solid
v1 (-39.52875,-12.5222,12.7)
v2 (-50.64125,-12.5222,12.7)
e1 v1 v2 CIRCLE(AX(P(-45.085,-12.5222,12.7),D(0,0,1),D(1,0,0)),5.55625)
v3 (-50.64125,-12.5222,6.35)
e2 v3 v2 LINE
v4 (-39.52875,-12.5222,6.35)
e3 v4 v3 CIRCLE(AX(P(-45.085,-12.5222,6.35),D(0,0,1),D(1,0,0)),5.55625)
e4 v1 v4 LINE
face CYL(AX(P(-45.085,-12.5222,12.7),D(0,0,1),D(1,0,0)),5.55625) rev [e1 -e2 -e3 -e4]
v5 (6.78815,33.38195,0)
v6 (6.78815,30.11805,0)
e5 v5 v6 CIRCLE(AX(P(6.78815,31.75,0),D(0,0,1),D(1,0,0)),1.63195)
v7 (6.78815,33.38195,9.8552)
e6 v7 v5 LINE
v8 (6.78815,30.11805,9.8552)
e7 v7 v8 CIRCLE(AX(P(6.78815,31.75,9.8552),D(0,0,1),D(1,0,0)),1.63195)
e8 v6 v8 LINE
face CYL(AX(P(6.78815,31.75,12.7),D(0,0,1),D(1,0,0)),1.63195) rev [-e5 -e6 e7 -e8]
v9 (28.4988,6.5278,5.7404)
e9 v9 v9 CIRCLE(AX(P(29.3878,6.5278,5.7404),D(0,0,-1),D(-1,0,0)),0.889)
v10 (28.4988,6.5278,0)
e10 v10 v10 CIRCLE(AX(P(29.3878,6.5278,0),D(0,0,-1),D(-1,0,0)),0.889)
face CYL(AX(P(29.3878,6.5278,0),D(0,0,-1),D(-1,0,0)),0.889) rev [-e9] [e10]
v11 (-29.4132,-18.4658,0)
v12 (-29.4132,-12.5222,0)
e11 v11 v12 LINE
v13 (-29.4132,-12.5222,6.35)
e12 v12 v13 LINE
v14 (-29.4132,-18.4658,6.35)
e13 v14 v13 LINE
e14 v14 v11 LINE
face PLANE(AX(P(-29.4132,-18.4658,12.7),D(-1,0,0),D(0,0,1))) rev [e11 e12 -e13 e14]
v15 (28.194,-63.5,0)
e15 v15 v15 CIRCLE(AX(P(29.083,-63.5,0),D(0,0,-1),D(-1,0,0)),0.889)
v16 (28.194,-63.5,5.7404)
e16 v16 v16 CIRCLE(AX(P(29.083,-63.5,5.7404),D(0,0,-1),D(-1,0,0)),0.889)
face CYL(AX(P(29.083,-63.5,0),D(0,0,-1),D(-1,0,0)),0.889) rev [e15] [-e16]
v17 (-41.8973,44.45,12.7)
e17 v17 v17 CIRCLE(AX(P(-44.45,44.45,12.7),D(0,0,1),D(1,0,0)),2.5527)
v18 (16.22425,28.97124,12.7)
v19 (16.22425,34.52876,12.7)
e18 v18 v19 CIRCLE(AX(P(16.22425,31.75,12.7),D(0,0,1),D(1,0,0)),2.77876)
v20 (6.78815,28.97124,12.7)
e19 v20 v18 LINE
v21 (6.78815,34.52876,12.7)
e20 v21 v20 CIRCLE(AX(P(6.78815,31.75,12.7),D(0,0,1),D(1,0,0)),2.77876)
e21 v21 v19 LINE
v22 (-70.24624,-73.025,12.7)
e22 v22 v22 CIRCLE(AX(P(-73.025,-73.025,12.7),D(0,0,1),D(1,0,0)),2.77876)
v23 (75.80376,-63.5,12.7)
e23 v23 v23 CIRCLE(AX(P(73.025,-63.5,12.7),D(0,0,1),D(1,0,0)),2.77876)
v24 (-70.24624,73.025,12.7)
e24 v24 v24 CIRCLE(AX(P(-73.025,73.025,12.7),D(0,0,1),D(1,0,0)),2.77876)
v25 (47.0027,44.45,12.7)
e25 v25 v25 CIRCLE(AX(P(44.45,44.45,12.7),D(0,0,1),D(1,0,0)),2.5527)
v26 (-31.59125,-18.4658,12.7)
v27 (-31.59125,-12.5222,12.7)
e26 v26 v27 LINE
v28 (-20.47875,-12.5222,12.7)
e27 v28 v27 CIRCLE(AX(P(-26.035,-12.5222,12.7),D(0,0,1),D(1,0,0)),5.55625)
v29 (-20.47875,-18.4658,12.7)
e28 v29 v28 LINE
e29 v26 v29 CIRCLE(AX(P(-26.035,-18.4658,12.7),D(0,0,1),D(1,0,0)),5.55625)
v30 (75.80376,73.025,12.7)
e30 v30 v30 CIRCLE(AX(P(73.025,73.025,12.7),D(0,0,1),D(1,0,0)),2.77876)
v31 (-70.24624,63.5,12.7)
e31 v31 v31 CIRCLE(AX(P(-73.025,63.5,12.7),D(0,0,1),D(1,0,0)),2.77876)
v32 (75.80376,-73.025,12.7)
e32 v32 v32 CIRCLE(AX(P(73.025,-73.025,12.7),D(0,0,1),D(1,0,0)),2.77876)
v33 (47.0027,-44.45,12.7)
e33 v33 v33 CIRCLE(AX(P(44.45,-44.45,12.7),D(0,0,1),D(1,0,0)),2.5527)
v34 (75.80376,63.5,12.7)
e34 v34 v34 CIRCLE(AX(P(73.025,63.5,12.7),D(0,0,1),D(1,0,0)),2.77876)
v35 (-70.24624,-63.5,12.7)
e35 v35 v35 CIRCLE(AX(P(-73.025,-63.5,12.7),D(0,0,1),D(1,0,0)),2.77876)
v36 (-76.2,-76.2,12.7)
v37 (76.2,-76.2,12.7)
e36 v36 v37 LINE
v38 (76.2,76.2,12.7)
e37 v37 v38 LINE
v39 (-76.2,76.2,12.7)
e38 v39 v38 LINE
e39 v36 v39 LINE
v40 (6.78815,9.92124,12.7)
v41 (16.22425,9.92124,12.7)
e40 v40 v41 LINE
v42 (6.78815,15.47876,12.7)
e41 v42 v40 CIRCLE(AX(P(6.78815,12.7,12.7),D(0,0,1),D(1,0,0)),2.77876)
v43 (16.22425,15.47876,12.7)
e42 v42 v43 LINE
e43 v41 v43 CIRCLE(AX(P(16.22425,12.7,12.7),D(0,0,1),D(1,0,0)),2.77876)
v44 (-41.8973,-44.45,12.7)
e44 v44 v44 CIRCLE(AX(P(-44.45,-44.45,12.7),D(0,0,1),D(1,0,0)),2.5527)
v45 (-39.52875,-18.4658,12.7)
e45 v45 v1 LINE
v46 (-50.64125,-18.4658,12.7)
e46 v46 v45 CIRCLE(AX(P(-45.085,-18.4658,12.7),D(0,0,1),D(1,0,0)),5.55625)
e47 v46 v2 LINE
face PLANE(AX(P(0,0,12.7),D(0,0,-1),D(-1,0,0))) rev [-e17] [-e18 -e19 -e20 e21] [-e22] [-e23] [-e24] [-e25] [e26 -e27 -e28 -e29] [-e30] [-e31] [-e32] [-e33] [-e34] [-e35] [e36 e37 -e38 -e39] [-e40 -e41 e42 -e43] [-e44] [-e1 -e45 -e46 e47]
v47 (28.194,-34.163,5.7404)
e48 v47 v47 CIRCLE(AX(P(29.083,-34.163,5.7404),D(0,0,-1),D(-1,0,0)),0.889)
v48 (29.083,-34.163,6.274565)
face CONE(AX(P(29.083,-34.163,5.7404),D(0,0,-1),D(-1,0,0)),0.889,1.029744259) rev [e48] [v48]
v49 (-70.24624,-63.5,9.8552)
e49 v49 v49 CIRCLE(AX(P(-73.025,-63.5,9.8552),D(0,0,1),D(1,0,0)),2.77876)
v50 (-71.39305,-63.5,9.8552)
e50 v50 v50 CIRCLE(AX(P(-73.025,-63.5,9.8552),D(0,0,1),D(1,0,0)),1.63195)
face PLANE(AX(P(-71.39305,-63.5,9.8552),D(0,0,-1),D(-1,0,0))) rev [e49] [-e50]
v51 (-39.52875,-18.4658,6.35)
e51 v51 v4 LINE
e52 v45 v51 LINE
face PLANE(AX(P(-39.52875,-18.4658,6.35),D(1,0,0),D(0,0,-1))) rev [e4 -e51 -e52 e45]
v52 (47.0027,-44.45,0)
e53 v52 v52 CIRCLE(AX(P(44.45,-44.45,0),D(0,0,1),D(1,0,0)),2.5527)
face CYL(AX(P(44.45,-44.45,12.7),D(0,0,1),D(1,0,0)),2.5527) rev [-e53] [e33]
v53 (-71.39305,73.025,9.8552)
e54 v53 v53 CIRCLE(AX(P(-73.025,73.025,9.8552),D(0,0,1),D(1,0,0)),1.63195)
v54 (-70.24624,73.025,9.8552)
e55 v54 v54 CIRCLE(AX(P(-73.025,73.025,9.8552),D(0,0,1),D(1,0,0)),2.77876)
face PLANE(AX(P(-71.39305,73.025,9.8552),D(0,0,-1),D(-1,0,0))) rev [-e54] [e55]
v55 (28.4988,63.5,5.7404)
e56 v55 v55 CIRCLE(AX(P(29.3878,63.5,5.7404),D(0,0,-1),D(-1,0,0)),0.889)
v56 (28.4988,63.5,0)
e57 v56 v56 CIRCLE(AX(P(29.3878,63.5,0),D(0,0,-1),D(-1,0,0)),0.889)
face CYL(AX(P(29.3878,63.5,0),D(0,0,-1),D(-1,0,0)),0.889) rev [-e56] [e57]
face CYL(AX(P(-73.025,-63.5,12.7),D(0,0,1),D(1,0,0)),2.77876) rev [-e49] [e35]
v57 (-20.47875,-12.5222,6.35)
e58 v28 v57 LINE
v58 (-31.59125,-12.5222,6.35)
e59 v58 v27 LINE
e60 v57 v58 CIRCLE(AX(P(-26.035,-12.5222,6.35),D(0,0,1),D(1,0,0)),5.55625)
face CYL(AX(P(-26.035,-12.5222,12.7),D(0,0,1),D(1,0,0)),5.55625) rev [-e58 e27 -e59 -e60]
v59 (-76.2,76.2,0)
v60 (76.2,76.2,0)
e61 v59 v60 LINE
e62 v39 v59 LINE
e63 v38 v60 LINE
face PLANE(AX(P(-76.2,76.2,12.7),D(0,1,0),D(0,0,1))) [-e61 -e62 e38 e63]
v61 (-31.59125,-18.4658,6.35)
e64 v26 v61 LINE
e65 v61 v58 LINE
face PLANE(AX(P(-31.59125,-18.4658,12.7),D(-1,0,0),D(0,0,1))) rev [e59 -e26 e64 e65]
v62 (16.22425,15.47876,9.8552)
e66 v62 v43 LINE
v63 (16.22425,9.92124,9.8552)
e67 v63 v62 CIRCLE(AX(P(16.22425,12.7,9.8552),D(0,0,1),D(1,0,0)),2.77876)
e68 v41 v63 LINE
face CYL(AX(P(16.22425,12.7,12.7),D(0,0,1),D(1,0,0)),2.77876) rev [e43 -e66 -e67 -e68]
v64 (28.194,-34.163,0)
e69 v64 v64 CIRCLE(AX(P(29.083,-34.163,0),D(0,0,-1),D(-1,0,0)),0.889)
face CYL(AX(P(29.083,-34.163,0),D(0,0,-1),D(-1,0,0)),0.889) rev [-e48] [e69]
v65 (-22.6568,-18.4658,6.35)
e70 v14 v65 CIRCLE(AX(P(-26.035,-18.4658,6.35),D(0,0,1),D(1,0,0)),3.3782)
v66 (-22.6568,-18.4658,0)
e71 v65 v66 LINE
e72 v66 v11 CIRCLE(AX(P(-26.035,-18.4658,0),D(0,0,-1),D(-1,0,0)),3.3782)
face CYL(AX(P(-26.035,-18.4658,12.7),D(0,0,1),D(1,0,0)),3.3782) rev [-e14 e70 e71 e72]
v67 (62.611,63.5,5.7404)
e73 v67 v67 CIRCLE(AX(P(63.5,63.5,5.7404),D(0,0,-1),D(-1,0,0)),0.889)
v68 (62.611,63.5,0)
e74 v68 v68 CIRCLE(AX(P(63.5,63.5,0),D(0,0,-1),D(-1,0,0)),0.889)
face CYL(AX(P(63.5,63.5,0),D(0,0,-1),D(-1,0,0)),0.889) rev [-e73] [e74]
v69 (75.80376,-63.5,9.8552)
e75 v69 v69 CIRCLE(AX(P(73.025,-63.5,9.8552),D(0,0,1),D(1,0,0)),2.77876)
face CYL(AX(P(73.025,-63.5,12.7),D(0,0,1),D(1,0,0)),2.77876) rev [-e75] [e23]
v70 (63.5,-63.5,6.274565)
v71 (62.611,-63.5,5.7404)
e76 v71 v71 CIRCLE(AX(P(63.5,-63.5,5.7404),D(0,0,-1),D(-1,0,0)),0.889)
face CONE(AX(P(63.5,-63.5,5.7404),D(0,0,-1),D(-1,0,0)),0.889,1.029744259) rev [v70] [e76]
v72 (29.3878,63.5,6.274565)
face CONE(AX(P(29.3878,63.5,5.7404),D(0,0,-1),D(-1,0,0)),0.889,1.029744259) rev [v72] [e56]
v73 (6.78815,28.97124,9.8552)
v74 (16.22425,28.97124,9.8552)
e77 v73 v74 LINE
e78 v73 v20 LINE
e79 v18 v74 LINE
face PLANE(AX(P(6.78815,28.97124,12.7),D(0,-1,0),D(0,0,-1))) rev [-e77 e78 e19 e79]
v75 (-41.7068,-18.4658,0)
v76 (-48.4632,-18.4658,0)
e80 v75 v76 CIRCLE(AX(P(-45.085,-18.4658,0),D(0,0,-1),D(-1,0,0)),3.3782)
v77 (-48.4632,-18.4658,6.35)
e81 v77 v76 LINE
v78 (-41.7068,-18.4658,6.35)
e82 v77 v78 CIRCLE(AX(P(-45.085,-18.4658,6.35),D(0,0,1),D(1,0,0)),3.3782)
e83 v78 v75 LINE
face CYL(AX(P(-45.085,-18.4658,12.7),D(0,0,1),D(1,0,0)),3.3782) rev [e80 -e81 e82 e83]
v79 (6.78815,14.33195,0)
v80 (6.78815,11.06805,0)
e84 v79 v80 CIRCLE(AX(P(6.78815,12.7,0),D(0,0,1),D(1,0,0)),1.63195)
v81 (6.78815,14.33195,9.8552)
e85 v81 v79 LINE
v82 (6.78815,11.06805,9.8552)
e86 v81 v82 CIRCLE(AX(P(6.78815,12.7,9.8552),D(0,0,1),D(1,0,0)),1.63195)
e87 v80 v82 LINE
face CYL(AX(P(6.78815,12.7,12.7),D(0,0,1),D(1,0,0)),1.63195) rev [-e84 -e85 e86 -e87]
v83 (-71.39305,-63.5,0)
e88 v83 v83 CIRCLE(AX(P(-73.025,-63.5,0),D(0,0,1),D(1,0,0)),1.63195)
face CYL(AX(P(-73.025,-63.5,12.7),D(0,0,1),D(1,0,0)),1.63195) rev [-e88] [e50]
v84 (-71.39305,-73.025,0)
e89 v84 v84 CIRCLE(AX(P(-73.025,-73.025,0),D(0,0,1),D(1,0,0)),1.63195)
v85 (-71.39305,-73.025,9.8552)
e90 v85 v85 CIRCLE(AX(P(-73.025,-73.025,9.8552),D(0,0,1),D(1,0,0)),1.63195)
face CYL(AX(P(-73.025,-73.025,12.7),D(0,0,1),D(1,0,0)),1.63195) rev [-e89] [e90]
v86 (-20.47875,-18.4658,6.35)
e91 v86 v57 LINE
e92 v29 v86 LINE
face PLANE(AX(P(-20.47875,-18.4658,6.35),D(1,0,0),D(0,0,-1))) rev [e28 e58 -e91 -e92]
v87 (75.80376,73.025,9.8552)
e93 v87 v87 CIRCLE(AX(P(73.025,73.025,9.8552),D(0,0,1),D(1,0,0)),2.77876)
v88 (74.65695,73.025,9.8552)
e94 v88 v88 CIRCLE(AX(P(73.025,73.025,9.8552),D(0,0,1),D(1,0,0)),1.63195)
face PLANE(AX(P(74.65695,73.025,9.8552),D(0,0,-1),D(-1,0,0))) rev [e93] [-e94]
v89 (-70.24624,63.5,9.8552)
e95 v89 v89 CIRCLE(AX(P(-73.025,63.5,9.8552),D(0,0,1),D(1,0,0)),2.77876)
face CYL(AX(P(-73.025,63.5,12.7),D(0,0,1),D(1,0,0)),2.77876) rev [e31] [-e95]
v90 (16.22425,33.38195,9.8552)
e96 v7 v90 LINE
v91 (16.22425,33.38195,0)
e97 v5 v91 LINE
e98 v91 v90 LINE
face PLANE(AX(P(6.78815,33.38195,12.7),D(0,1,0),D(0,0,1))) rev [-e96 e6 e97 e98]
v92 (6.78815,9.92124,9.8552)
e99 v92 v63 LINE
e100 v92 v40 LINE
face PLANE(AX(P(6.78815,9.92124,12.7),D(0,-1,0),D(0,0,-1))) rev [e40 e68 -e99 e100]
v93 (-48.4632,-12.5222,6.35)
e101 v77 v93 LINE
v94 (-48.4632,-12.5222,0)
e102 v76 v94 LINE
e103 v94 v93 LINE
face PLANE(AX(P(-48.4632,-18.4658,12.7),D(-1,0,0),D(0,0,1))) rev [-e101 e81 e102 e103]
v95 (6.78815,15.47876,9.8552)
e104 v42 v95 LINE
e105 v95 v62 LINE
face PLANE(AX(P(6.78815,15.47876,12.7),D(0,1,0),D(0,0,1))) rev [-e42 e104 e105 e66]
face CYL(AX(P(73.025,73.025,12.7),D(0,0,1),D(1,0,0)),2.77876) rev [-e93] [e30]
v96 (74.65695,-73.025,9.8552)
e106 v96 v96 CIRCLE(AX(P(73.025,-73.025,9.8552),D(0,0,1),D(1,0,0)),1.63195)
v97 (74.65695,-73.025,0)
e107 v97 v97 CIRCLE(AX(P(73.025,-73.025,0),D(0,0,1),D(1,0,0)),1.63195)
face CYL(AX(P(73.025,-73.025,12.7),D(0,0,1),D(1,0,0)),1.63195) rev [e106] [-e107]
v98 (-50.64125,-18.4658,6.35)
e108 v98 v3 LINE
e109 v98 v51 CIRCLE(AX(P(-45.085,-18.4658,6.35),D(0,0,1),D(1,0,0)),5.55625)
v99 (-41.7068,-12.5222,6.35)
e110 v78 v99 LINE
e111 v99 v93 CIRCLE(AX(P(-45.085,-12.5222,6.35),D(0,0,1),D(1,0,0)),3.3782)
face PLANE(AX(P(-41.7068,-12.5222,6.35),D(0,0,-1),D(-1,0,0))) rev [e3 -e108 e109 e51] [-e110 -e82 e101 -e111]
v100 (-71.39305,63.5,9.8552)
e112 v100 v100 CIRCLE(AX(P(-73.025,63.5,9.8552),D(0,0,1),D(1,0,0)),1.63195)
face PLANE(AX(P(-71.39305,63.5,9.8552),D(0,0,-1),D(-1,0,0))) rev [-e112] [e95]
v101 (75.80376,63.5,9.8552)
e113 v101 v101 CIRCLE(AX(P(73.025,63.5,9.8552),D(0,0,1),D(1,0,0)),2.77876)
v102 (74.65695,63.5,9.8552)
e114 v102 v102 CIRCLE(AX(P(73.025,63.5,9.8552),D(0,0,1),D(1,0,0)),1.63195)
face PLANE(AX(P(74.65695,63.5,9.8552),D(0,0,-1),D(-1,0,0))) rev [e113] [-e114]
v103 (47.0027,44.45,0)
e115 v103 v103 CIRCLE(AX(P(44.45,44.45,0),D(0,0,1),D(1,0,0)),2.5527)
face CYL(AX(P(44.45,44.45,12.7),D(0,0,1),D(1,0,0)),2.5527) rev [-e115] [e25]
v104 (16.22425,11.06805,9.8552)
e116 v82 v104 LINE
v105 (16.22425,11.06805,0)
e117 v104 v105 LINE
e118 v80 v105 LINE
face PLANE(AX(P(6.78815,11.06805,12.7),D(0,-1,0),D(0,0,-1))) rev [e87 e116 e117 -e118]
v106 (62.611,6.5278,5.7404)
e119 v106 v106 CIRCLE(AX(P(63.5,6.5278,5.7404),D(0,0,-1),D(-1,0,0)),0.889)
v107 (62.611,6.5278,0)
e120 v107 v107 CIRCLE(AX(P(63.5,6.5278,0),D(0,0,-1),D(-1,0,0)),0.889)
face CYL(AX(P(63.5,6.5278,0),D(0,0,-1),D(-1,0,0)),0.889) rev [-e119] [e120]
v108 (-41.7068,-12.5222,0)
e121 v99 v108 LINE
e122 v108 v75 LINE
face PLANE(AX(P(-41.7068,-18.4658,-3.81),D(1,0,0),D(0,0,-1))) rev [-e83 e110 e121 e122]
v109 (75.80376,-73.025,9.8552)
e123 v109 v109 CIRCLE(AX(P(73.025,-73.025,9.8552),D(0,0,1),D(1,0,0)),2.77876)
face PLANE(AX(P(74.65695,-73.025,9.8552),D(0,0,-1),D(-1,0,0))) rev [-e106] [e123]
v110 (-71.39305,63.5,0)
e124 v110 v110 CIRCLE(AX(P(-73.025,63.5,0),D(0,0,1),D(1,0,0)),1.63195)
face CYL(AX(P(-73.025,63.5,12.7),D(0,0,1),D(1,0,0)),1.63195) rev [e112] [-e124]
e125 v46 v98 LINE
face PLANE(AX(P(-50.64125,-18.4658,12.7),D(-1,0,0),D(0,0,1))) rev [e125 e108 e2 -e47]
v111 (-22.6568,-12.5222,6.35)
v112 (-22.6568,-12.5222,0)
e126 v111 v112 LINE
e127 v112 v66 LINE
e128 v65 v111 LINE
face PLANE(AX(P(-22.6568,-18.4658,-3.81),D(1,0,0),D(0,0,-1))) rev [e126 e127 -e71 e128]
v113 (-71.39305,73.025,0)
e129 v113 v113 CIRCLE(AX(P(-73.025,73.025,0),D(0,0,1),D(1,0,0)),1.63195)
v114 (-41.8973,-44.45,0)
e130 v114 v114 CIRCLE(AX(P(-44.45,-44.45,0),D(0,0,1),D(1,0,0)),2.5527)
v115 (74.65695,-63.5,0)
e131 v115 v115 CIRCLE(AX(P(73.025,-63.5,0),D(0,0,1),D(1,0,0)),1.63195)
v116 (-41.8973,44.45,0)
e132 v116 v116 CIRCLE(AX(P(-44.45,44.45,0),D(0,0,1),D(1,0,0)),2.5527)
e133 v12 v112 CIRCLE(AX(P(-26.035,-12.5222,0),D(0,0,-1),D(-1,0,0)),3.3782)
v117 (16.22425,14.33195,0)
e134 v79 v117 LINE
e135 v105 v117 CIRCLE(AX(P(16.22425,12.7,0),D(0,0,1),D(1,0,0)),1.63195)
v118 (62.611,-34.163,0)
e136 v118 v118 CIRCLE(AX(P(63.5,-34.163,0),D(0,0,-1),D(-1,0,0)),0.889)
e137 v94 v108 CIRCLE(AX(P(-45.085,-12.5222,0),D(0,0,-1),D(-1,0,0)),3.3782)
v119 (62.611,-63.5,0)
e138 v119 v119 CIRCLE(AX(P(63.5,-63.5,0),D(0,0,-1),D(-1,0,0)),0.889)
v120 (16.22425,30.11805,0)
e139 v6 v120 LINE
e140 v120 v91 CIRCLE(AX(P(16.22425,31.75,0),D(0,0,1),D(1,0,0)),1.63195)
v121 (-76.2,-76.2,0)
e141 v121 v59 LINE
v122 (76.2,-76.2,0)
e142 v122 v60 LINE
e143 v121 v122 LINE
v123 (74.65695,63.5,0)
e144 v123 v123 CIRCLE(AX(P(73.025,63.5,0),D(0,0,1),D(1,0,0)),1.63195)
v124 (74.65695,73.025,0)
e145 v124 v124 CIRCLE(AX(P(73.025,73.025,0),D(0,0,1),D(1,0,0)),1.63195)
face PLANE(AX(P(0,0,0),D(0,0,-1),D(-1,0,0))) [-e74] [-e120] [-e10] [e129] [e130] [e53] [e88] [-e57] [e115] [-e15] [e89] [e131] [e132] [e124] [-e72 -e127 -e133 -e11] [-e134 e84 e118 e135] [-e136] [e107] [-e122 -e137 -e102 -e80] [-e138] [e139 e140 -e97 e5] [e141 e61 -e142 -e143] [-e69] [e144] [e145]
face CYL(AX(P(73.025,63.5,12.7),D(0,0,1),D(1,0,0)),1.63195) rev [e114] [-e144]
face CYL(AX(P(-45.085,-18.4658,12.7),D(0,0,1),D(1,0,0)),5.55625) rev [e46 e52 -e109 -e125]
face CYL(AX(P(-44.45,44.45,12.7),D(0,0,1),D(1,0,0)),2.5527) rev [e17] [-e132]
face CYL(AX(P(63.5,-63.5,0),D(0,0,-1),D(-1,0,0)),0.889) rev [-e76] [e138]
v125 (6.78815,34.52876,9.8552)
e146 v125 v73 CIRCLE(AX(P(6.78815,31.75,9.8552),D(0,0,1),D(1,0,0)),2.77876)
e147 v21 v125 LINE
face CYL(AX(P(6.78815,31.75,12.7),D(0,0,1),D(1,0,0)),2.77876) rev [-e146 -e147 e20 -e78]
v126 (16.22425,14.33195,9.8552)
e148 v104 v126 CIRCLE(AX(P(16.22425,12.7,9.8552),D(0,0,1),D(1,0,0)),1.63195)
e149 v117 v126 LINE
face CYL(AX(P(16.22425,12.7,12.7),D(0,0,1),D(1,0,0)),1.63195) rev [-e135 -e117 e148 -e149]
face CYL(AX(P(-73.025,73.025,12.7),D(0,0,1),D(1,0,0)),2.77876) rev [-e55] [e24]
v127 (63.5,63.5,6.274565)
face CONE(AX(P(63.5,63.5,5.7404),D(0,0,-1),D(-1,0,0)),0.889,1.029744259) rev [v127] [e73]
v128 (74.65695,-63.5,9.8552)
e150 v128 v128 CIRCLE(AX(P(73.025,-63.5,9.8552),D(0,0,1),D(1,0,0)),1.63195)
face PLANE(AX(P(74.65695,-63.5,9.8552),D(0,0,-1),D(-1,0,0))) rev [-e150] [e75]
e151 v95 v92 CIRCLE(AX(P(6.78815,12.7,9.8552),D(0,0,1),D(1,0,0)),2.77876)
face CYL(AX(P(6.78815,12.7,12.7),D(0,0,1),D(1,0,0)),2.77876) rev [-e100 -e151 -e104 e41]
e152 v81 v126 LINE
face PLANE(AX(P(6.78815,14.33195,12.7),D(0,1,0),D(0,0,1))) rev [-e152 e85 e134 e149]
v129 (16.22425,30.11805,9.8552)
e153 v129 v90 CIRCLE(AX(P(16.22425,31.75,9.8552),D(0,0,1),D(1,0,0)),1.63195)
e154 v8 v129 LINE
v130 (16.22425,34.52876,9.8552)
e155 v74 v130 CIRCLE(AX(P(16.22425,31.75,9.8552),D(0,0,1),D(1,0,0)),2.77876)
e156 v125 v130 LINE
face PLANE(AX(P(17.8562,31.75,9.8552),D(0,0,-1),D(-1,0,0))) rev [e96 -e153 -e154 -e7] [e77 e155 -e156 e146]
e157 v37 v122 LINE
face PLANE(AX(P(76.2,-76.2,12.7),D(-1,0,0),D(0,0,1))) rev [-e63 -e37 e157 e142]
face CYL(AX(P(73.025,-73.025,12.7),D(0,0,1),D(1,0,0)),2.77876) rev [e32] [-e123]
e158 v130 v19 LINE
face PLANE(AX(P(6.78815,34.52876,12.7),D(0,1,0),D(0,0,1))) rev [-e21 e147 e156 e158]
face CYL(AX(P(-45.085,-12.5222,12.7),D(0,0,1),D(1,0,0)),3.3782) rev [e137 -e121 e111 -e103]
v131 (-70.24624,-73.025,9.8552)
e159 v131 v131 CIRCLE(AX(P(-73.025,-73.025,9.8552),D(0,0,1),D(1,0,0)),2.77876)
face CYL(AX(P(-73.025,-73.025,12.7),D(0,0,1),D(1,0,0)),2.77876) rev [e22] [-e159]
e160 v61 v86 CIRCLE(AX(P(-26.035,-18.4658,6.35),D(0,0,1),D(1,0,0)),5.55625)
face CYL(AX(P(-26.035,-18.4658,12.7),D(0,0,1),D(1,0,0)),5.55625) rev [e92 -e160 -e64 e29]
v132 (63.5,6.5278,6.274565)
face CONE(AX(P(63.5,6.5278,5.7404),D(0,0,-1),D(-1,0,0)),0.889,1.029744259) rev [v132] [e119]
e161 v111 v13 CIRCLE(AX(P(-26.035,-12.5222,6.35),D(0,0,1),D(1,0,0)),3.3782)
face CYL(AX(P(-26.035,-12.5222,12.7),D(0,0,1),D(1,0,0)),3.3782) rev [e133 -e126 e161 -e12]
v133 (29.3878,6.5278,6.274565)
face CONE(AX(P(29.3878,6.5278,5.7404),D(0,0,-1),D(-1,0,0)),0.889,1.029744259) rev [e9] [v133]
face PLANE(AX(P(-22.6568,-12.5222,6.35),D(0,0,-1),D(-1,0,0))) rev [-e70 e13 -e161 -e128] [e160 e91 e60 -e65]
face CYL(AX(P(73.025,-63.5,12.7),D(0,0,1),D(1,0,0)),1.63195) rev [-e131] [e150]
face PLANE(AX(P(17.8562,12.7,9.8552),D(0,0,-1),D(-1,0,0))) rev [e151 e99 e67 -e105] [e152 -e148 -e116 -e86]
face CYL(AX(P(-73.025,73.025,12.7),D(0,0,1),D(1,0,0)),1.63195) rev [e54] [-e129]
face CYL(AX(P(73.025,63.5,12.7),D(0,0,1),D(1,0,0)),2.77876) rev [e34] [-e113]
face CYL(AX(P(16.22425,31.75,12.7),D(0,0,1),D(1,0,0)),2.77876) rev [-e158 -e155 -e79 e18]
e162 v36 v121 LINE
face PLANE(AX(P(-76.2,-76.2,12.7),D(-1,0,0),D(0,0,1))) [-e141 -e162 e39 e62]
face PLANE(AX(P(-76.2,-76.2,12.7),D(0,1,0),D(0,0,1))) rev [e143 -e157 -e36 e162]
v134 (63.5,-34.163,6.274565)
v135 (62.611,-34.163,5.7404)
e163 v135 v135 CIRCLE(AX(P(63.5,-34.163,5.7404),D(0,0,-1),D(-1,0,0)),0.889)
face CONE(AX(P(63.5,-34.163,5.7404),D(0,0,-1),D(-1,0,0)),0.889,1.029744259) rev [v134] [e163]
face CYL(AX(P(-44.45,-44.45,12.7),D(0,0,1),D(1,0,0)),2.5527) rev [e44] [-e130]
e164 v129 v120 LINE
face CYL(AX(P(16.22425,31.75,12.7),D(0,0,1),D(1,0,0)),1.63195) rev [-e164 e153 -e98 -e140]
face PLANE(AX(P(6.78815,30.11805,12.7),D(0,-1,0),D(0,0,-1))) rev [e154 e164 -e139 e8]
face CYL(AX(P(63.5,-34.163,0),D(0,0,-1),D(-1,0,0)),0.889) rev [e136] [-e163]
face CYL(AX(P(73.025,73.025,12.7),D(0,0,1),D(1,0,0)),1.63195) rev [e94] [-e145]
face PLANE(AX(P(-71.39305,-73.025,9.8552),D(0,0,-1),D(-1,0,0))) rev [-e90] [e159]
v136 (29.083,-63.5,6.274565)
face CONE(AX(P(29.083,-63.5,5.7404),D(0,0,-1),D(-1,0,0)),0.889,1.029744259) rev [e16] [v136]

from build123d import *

# Parameters (mm, degrees)
SKETCH1_W                                      = 152.4
SKETCH1_H                                      = 152.4
BOSS_EXTRUDE1_DEPTH                            = 12.7
F_1_4_20_TAPPED_HOLE1_D                        = 5.1054
CBORE_FOR_4_SOCKET_HEAD_CAP_SCREW1_D           = 3.2639
CBORE_FOR_4_SOCKET_HEAD_CAP_SCREW1_CBORE_D     = 5.55752
CBORE_FOR_4_SOCKET_HEAD_CAP_SCREW1_CBORE_DEPTH = 2.8448
F_2_56_TAPPED_HOLE1_D                          = 1.778
F_2_56_TAPPED_HOLE1_DEPTH                      = 5.7404
F_2_56_TAPPED_HOLE1_TIP                        = 0.53416509
F_2_56_TAPPED_HOLE2_D                          = 1.778
F_2_56_TAPPED_HOLE2_DEPTH                      = 5.7404
F_2_56_TAPPED_HOLE2_TIP                        = 0.53416509
CBORE_SLOT_FOR_4_SOCKET_HEAD_CAP_SCREW1_DEPTH  = 12.7
CBORE_START                                    = 9.8552
CBORE_SLOT_FOR_4_SOCKET_HEAD_CAP_SC_3_DEPTH    = 2.8448
CBORE_START_2                                  = 6.35
CBORE_SLOT_FOR_1_4_SOCKET_HEAD_CAP_SCREW_DEPTH = 6.35
CBORE_SLOT_FOR_1_4_SOCKET_HEAD_CAP_S_3_DEPTH   = 6.35


# Read off the part's stored shape, not the designer's step: CBORE SLOT for #4 Socket Head Cap Screw1, CBORE SLOT for 1/4 Socket Head Cap Screw3
with BuildPart() as part:
    # Sketch1 → Boss-Extrude1 (new body)
    with BuildSketch(Plane.XY):
        Rectangle(SKETCH1_W, SKETCH1_H)
    extrude(amount=BOSS_EXTRUDE1_DEPTH)

    # 1/4-20 Tapped Hole1 (through all)
    with Locations(Plane.XY.offset(12.7)):
        with Locations((44.45, 44.45), (44.45, -44.45), (-44.45, -44.45), (-44.45, 44.45)):
            Hole(F_1_4_20_TAPPED_HOLE1_D / 2)

    # CBORE for #4 Socket Head Cap Screw1 (through all)
    with Locations(Plane.XY.offset(12.7)):
        with Locations((-73.025, 63.5), (-73.025, 73.025), (73.025, 63.5), (73.025, 73.025), (73.025, -63.5), (73.025, -73.025), (-73.025, -63.5), (-73.025, -73.025)):
            CounterBoreHole(CBORE_FOR_4_SOCKET_HEAD_CAP_SCREW1_D / 2, CBORE_FOR_4_SOCKET_HEAD_CAP_SCREW1_CBORE_D / 2, CBORE_FOR_4_SOCKET_HEAD_CAP_SCREW1_CBORE_DEPTH)

    # #2-56 Tapped Hole1
    with Locations(Plane(origin=(0, 0, 0), x_dir=(-1, 0, 0), z_dir=(0, 0, -1))):
        with Locations((-63.5, -63.5), (-63.5, -34.163), (-29.083, -63.5), (-29.083, -34.163)):
            Hole(F_2_56_TAPPED_HOLE1_D / 2, depth=F_2_56_TAPPED_HOLE1_DEPTH)
            with Locations((0, 0, -(F_2_56_TAPPED_HOLE1_DEPTH + F_2_56_TAPPED_HOLE1_TIP / 2))):  # 118° drill point
                Cone(0, F_2_56_TAPPED_HOLE1_D / 2, F_2_56_TAPPED_HOLE1_TIP, mode=Mode.SUBTRACT)

    # #2-56 Tapped Hole2
    with Locations(Plane(origin=(0, 0, 0), x_dir=(-1, 0, 0), z_dir=(0, 0, -1))):
        with Locations((-63.5, 6.5278), (-63.5, 63.5), (-29.3878, 63.5), (-29.3878, 6.5278)):
            Hole(F_2_56_TAPPED_HOLE2_D / 2, depth=F_2_56_TAPPED_HOLE2_DEPTH)
            with Locations((0, 0, -(F_2_56_TAPPED_HOLE2_DEPTH + F_2_56_TAPPED_HOLE2_TIP / 2))):  # 118° drill point
                Cone(0, F_2_56_TAPPED_HOLE2_D / 2, F_2_56_TAPPED_HOLE2_TIP, mode=Mode.SUBTRACT)

    # CBORE SLOT for _4 Socket Head Cap Sc 2 → CBORE SLOT for #4 Socket Head Cap Screw1 (cut)
    with BuildSketch(Plane.XY):
        with BuildLine():
            Line((6.78815, 30.11805), (16.22425, 30.11805))
            ThreePointArc((16.22425, 30.11805), (17.8562, 31.75), (16.22425, 33.38195))
            Line((16.22425, 33.38195), (6.78815, 33.38195))
            ThreePointArc((6.78815, 33.38195), (5.1562, 31.75), (6.78815, 30.11805))
        make_face()
        with BuildLine():
            Line((6.78815, 11.06805), (16.22425, 11.06805))
            ThreePointArc((16.22425, 11.06805), (17.8562, 12.7), (16.22425, 14.33195))
            Line((16.22425, 14.33195), (6.78815, 14.33195))
            ThreePointArc((6.78815, 14.33195), (5.1562, 12.7), (6.78815, 11.06805))
        make_face()
    extrude(amount=CBORE_SLOT_FOR_4_SOCKET_HEAD_CAP_SCREW1_DEPTH, mode=Mode.SUBTRACT)

    # CBORE SLOT for _4 Socket Head Cap Sc 3 o → CBORE SLOT for _4 Socket Head Cap Sc 3 (cut)
    # profile 1 of 2: a face of its own
    with BuildSketch(Plane.XY.offset(CBORE_START)):
        with BuildLine():
            Line((6.78815, 28.97124), (16.22425, 28.97124))
            ThreePointArc((16.22425, 28.97124), (19.00301, 31.75), (16.22425, 34.52876))
            Line((16.22425, 34.52876), (6.78815, 34.52876))
            ThreePointArc((6.78815, 34.52876), (4.00939, 31.75), (6.78815, 28.97124))
        make_face()
        with BuildLine():
            ThreePointArc((16.22425, 33.38195), (17.8562, 31.75), (16.22425, 30.11805))
            Line((16.22425, 30.11805), (6.78815, 30.11805))
            ThreePointArc((6.78815, 30.11805), (5.1562, 31.75), (6.78815, 33.38195))
            Line((6.78815, 33.38195), (16.22425, 33.38195))
        make_face(mode=Mode.SUBTRACT)
    # profile 2 of 2: a face of its own
    with BuildSketch(Plane.XY.offset(CBORE_START)):
        with BuildLine():
            Line((6.78815, 9.92124), (16.22425, 9.92124))
            ThreePointArc((16.22425, 9.92124), (19.00301, 12.7), (16.22425, 15.47876))
            Line((16.22425, 15.47876), (6.78815, 15.47876))
            ThreePointArc((6.78815, 15.47876), (4.00939, 12.7), (6.78815, 9.92124))
        make_face()
        with BuildLine():
            ThreePointArc((16.22425, 14.33195), (17.8562, 12.7), (16.22425, 11.06805))
            Line((16.22425, 11.06805), (6.78815, 11.06805))
            ThreePointArc((6.78815, 11.06805), (5.1562, 12.7), (6.78815, 14.33195))
            Line((6.78815, 14.33195), (16.22425, 14.33195))
        make_face(mode=Mode.SUBTRACT)
    extrude(amount=CBORE_SLOT_FOR_4_SOCKET_HEAD_CAP_SC_3_DEPTH, mode=Mode.SUBTRACT)

    # CBORE SLOT for 1_4 Socket Head Cap S 2 → CBORE SLOT for 1/4 Socket Head Cap Screw3 (cut)
    with BuildSketch(Plane.XY.offset(CBORE_START_2)):
        with BuildLine():
            Line((-39.52875, -18.4658), (-39.52875, -12.5222))
            ThreePointArc((-39.52875, -12.5222), (-45.085, -6.96595), (-50.64125, -12.5222))
            Line((-50.64125, -12.5222), (-50.64125, -18.4658))
            ThreePointArc((-50.64125, -18.4658), (-45.085, -24.02205), (-39.52875, -18.4658))
        make_face()
        with BuildLine():
            Line((-20.47875, -18.4658), (-20.47875, -12.5222))
            ThreePointArc((-20.47875, -12.5222), (-26.035, -6.96595), (-31.59125, -12.5222))
            Line((-31.59125, -12.5222), (-31.59125, -18.4658))
            ThreePointArc((-31.59125, -18.4658), (-26.035, -24.02205), (-20.47875, -18.4658))
        make_face()
    extrude(amount=CBORE_SLOT_FOR_1_4_SOCKET_HEAD_CAP_SCREW_DEPTH, mode=Mode.SUBTRACT)

    # CBORE SLOT for 1_4 Socket Head Cap S 3 o → CBORE SLOT for 1_4 Socket Head Cap S 3 (cut)
    with BuildSketch(Plane.XY):
        with BuildLine():
            Line((-41.7068, -18.4658), (-41.7068, -12.5222))
            ThreePointArc((-41.7068, -12.5222), (-45.085, -9.144), (-48.4632, -12.5222))
            Line((-48.4632, -12.5222), (-48.4632, -18.4658))
            ThreePointArc((-48.4632, -18.4658), (-45.085, -21.844), (-41.7068, -18.4658))
        make_face()
        with BuildLine():
            Line((-22.6568, -18.4658), (-22.6568, -12.5222))
            ThreePointArc((-22.6568, -12.5222), (-26.035, -9.144), (-29.4132, -12.5222))
            Line((-29.4132, -12.5222), (-29.4132, -18.4658))
            ThreePointArc((-29.4132, -18.4658), (-26.035, -21.844), (-22.6568, -18.4658))
        make_face()
    extrude(amount=CBORE_SLOT_FOR_1_4_SOCKET_HEAD_CAP_S_3_DEPTH, mode=Mode.SUBTRACT)


solid = part.part
